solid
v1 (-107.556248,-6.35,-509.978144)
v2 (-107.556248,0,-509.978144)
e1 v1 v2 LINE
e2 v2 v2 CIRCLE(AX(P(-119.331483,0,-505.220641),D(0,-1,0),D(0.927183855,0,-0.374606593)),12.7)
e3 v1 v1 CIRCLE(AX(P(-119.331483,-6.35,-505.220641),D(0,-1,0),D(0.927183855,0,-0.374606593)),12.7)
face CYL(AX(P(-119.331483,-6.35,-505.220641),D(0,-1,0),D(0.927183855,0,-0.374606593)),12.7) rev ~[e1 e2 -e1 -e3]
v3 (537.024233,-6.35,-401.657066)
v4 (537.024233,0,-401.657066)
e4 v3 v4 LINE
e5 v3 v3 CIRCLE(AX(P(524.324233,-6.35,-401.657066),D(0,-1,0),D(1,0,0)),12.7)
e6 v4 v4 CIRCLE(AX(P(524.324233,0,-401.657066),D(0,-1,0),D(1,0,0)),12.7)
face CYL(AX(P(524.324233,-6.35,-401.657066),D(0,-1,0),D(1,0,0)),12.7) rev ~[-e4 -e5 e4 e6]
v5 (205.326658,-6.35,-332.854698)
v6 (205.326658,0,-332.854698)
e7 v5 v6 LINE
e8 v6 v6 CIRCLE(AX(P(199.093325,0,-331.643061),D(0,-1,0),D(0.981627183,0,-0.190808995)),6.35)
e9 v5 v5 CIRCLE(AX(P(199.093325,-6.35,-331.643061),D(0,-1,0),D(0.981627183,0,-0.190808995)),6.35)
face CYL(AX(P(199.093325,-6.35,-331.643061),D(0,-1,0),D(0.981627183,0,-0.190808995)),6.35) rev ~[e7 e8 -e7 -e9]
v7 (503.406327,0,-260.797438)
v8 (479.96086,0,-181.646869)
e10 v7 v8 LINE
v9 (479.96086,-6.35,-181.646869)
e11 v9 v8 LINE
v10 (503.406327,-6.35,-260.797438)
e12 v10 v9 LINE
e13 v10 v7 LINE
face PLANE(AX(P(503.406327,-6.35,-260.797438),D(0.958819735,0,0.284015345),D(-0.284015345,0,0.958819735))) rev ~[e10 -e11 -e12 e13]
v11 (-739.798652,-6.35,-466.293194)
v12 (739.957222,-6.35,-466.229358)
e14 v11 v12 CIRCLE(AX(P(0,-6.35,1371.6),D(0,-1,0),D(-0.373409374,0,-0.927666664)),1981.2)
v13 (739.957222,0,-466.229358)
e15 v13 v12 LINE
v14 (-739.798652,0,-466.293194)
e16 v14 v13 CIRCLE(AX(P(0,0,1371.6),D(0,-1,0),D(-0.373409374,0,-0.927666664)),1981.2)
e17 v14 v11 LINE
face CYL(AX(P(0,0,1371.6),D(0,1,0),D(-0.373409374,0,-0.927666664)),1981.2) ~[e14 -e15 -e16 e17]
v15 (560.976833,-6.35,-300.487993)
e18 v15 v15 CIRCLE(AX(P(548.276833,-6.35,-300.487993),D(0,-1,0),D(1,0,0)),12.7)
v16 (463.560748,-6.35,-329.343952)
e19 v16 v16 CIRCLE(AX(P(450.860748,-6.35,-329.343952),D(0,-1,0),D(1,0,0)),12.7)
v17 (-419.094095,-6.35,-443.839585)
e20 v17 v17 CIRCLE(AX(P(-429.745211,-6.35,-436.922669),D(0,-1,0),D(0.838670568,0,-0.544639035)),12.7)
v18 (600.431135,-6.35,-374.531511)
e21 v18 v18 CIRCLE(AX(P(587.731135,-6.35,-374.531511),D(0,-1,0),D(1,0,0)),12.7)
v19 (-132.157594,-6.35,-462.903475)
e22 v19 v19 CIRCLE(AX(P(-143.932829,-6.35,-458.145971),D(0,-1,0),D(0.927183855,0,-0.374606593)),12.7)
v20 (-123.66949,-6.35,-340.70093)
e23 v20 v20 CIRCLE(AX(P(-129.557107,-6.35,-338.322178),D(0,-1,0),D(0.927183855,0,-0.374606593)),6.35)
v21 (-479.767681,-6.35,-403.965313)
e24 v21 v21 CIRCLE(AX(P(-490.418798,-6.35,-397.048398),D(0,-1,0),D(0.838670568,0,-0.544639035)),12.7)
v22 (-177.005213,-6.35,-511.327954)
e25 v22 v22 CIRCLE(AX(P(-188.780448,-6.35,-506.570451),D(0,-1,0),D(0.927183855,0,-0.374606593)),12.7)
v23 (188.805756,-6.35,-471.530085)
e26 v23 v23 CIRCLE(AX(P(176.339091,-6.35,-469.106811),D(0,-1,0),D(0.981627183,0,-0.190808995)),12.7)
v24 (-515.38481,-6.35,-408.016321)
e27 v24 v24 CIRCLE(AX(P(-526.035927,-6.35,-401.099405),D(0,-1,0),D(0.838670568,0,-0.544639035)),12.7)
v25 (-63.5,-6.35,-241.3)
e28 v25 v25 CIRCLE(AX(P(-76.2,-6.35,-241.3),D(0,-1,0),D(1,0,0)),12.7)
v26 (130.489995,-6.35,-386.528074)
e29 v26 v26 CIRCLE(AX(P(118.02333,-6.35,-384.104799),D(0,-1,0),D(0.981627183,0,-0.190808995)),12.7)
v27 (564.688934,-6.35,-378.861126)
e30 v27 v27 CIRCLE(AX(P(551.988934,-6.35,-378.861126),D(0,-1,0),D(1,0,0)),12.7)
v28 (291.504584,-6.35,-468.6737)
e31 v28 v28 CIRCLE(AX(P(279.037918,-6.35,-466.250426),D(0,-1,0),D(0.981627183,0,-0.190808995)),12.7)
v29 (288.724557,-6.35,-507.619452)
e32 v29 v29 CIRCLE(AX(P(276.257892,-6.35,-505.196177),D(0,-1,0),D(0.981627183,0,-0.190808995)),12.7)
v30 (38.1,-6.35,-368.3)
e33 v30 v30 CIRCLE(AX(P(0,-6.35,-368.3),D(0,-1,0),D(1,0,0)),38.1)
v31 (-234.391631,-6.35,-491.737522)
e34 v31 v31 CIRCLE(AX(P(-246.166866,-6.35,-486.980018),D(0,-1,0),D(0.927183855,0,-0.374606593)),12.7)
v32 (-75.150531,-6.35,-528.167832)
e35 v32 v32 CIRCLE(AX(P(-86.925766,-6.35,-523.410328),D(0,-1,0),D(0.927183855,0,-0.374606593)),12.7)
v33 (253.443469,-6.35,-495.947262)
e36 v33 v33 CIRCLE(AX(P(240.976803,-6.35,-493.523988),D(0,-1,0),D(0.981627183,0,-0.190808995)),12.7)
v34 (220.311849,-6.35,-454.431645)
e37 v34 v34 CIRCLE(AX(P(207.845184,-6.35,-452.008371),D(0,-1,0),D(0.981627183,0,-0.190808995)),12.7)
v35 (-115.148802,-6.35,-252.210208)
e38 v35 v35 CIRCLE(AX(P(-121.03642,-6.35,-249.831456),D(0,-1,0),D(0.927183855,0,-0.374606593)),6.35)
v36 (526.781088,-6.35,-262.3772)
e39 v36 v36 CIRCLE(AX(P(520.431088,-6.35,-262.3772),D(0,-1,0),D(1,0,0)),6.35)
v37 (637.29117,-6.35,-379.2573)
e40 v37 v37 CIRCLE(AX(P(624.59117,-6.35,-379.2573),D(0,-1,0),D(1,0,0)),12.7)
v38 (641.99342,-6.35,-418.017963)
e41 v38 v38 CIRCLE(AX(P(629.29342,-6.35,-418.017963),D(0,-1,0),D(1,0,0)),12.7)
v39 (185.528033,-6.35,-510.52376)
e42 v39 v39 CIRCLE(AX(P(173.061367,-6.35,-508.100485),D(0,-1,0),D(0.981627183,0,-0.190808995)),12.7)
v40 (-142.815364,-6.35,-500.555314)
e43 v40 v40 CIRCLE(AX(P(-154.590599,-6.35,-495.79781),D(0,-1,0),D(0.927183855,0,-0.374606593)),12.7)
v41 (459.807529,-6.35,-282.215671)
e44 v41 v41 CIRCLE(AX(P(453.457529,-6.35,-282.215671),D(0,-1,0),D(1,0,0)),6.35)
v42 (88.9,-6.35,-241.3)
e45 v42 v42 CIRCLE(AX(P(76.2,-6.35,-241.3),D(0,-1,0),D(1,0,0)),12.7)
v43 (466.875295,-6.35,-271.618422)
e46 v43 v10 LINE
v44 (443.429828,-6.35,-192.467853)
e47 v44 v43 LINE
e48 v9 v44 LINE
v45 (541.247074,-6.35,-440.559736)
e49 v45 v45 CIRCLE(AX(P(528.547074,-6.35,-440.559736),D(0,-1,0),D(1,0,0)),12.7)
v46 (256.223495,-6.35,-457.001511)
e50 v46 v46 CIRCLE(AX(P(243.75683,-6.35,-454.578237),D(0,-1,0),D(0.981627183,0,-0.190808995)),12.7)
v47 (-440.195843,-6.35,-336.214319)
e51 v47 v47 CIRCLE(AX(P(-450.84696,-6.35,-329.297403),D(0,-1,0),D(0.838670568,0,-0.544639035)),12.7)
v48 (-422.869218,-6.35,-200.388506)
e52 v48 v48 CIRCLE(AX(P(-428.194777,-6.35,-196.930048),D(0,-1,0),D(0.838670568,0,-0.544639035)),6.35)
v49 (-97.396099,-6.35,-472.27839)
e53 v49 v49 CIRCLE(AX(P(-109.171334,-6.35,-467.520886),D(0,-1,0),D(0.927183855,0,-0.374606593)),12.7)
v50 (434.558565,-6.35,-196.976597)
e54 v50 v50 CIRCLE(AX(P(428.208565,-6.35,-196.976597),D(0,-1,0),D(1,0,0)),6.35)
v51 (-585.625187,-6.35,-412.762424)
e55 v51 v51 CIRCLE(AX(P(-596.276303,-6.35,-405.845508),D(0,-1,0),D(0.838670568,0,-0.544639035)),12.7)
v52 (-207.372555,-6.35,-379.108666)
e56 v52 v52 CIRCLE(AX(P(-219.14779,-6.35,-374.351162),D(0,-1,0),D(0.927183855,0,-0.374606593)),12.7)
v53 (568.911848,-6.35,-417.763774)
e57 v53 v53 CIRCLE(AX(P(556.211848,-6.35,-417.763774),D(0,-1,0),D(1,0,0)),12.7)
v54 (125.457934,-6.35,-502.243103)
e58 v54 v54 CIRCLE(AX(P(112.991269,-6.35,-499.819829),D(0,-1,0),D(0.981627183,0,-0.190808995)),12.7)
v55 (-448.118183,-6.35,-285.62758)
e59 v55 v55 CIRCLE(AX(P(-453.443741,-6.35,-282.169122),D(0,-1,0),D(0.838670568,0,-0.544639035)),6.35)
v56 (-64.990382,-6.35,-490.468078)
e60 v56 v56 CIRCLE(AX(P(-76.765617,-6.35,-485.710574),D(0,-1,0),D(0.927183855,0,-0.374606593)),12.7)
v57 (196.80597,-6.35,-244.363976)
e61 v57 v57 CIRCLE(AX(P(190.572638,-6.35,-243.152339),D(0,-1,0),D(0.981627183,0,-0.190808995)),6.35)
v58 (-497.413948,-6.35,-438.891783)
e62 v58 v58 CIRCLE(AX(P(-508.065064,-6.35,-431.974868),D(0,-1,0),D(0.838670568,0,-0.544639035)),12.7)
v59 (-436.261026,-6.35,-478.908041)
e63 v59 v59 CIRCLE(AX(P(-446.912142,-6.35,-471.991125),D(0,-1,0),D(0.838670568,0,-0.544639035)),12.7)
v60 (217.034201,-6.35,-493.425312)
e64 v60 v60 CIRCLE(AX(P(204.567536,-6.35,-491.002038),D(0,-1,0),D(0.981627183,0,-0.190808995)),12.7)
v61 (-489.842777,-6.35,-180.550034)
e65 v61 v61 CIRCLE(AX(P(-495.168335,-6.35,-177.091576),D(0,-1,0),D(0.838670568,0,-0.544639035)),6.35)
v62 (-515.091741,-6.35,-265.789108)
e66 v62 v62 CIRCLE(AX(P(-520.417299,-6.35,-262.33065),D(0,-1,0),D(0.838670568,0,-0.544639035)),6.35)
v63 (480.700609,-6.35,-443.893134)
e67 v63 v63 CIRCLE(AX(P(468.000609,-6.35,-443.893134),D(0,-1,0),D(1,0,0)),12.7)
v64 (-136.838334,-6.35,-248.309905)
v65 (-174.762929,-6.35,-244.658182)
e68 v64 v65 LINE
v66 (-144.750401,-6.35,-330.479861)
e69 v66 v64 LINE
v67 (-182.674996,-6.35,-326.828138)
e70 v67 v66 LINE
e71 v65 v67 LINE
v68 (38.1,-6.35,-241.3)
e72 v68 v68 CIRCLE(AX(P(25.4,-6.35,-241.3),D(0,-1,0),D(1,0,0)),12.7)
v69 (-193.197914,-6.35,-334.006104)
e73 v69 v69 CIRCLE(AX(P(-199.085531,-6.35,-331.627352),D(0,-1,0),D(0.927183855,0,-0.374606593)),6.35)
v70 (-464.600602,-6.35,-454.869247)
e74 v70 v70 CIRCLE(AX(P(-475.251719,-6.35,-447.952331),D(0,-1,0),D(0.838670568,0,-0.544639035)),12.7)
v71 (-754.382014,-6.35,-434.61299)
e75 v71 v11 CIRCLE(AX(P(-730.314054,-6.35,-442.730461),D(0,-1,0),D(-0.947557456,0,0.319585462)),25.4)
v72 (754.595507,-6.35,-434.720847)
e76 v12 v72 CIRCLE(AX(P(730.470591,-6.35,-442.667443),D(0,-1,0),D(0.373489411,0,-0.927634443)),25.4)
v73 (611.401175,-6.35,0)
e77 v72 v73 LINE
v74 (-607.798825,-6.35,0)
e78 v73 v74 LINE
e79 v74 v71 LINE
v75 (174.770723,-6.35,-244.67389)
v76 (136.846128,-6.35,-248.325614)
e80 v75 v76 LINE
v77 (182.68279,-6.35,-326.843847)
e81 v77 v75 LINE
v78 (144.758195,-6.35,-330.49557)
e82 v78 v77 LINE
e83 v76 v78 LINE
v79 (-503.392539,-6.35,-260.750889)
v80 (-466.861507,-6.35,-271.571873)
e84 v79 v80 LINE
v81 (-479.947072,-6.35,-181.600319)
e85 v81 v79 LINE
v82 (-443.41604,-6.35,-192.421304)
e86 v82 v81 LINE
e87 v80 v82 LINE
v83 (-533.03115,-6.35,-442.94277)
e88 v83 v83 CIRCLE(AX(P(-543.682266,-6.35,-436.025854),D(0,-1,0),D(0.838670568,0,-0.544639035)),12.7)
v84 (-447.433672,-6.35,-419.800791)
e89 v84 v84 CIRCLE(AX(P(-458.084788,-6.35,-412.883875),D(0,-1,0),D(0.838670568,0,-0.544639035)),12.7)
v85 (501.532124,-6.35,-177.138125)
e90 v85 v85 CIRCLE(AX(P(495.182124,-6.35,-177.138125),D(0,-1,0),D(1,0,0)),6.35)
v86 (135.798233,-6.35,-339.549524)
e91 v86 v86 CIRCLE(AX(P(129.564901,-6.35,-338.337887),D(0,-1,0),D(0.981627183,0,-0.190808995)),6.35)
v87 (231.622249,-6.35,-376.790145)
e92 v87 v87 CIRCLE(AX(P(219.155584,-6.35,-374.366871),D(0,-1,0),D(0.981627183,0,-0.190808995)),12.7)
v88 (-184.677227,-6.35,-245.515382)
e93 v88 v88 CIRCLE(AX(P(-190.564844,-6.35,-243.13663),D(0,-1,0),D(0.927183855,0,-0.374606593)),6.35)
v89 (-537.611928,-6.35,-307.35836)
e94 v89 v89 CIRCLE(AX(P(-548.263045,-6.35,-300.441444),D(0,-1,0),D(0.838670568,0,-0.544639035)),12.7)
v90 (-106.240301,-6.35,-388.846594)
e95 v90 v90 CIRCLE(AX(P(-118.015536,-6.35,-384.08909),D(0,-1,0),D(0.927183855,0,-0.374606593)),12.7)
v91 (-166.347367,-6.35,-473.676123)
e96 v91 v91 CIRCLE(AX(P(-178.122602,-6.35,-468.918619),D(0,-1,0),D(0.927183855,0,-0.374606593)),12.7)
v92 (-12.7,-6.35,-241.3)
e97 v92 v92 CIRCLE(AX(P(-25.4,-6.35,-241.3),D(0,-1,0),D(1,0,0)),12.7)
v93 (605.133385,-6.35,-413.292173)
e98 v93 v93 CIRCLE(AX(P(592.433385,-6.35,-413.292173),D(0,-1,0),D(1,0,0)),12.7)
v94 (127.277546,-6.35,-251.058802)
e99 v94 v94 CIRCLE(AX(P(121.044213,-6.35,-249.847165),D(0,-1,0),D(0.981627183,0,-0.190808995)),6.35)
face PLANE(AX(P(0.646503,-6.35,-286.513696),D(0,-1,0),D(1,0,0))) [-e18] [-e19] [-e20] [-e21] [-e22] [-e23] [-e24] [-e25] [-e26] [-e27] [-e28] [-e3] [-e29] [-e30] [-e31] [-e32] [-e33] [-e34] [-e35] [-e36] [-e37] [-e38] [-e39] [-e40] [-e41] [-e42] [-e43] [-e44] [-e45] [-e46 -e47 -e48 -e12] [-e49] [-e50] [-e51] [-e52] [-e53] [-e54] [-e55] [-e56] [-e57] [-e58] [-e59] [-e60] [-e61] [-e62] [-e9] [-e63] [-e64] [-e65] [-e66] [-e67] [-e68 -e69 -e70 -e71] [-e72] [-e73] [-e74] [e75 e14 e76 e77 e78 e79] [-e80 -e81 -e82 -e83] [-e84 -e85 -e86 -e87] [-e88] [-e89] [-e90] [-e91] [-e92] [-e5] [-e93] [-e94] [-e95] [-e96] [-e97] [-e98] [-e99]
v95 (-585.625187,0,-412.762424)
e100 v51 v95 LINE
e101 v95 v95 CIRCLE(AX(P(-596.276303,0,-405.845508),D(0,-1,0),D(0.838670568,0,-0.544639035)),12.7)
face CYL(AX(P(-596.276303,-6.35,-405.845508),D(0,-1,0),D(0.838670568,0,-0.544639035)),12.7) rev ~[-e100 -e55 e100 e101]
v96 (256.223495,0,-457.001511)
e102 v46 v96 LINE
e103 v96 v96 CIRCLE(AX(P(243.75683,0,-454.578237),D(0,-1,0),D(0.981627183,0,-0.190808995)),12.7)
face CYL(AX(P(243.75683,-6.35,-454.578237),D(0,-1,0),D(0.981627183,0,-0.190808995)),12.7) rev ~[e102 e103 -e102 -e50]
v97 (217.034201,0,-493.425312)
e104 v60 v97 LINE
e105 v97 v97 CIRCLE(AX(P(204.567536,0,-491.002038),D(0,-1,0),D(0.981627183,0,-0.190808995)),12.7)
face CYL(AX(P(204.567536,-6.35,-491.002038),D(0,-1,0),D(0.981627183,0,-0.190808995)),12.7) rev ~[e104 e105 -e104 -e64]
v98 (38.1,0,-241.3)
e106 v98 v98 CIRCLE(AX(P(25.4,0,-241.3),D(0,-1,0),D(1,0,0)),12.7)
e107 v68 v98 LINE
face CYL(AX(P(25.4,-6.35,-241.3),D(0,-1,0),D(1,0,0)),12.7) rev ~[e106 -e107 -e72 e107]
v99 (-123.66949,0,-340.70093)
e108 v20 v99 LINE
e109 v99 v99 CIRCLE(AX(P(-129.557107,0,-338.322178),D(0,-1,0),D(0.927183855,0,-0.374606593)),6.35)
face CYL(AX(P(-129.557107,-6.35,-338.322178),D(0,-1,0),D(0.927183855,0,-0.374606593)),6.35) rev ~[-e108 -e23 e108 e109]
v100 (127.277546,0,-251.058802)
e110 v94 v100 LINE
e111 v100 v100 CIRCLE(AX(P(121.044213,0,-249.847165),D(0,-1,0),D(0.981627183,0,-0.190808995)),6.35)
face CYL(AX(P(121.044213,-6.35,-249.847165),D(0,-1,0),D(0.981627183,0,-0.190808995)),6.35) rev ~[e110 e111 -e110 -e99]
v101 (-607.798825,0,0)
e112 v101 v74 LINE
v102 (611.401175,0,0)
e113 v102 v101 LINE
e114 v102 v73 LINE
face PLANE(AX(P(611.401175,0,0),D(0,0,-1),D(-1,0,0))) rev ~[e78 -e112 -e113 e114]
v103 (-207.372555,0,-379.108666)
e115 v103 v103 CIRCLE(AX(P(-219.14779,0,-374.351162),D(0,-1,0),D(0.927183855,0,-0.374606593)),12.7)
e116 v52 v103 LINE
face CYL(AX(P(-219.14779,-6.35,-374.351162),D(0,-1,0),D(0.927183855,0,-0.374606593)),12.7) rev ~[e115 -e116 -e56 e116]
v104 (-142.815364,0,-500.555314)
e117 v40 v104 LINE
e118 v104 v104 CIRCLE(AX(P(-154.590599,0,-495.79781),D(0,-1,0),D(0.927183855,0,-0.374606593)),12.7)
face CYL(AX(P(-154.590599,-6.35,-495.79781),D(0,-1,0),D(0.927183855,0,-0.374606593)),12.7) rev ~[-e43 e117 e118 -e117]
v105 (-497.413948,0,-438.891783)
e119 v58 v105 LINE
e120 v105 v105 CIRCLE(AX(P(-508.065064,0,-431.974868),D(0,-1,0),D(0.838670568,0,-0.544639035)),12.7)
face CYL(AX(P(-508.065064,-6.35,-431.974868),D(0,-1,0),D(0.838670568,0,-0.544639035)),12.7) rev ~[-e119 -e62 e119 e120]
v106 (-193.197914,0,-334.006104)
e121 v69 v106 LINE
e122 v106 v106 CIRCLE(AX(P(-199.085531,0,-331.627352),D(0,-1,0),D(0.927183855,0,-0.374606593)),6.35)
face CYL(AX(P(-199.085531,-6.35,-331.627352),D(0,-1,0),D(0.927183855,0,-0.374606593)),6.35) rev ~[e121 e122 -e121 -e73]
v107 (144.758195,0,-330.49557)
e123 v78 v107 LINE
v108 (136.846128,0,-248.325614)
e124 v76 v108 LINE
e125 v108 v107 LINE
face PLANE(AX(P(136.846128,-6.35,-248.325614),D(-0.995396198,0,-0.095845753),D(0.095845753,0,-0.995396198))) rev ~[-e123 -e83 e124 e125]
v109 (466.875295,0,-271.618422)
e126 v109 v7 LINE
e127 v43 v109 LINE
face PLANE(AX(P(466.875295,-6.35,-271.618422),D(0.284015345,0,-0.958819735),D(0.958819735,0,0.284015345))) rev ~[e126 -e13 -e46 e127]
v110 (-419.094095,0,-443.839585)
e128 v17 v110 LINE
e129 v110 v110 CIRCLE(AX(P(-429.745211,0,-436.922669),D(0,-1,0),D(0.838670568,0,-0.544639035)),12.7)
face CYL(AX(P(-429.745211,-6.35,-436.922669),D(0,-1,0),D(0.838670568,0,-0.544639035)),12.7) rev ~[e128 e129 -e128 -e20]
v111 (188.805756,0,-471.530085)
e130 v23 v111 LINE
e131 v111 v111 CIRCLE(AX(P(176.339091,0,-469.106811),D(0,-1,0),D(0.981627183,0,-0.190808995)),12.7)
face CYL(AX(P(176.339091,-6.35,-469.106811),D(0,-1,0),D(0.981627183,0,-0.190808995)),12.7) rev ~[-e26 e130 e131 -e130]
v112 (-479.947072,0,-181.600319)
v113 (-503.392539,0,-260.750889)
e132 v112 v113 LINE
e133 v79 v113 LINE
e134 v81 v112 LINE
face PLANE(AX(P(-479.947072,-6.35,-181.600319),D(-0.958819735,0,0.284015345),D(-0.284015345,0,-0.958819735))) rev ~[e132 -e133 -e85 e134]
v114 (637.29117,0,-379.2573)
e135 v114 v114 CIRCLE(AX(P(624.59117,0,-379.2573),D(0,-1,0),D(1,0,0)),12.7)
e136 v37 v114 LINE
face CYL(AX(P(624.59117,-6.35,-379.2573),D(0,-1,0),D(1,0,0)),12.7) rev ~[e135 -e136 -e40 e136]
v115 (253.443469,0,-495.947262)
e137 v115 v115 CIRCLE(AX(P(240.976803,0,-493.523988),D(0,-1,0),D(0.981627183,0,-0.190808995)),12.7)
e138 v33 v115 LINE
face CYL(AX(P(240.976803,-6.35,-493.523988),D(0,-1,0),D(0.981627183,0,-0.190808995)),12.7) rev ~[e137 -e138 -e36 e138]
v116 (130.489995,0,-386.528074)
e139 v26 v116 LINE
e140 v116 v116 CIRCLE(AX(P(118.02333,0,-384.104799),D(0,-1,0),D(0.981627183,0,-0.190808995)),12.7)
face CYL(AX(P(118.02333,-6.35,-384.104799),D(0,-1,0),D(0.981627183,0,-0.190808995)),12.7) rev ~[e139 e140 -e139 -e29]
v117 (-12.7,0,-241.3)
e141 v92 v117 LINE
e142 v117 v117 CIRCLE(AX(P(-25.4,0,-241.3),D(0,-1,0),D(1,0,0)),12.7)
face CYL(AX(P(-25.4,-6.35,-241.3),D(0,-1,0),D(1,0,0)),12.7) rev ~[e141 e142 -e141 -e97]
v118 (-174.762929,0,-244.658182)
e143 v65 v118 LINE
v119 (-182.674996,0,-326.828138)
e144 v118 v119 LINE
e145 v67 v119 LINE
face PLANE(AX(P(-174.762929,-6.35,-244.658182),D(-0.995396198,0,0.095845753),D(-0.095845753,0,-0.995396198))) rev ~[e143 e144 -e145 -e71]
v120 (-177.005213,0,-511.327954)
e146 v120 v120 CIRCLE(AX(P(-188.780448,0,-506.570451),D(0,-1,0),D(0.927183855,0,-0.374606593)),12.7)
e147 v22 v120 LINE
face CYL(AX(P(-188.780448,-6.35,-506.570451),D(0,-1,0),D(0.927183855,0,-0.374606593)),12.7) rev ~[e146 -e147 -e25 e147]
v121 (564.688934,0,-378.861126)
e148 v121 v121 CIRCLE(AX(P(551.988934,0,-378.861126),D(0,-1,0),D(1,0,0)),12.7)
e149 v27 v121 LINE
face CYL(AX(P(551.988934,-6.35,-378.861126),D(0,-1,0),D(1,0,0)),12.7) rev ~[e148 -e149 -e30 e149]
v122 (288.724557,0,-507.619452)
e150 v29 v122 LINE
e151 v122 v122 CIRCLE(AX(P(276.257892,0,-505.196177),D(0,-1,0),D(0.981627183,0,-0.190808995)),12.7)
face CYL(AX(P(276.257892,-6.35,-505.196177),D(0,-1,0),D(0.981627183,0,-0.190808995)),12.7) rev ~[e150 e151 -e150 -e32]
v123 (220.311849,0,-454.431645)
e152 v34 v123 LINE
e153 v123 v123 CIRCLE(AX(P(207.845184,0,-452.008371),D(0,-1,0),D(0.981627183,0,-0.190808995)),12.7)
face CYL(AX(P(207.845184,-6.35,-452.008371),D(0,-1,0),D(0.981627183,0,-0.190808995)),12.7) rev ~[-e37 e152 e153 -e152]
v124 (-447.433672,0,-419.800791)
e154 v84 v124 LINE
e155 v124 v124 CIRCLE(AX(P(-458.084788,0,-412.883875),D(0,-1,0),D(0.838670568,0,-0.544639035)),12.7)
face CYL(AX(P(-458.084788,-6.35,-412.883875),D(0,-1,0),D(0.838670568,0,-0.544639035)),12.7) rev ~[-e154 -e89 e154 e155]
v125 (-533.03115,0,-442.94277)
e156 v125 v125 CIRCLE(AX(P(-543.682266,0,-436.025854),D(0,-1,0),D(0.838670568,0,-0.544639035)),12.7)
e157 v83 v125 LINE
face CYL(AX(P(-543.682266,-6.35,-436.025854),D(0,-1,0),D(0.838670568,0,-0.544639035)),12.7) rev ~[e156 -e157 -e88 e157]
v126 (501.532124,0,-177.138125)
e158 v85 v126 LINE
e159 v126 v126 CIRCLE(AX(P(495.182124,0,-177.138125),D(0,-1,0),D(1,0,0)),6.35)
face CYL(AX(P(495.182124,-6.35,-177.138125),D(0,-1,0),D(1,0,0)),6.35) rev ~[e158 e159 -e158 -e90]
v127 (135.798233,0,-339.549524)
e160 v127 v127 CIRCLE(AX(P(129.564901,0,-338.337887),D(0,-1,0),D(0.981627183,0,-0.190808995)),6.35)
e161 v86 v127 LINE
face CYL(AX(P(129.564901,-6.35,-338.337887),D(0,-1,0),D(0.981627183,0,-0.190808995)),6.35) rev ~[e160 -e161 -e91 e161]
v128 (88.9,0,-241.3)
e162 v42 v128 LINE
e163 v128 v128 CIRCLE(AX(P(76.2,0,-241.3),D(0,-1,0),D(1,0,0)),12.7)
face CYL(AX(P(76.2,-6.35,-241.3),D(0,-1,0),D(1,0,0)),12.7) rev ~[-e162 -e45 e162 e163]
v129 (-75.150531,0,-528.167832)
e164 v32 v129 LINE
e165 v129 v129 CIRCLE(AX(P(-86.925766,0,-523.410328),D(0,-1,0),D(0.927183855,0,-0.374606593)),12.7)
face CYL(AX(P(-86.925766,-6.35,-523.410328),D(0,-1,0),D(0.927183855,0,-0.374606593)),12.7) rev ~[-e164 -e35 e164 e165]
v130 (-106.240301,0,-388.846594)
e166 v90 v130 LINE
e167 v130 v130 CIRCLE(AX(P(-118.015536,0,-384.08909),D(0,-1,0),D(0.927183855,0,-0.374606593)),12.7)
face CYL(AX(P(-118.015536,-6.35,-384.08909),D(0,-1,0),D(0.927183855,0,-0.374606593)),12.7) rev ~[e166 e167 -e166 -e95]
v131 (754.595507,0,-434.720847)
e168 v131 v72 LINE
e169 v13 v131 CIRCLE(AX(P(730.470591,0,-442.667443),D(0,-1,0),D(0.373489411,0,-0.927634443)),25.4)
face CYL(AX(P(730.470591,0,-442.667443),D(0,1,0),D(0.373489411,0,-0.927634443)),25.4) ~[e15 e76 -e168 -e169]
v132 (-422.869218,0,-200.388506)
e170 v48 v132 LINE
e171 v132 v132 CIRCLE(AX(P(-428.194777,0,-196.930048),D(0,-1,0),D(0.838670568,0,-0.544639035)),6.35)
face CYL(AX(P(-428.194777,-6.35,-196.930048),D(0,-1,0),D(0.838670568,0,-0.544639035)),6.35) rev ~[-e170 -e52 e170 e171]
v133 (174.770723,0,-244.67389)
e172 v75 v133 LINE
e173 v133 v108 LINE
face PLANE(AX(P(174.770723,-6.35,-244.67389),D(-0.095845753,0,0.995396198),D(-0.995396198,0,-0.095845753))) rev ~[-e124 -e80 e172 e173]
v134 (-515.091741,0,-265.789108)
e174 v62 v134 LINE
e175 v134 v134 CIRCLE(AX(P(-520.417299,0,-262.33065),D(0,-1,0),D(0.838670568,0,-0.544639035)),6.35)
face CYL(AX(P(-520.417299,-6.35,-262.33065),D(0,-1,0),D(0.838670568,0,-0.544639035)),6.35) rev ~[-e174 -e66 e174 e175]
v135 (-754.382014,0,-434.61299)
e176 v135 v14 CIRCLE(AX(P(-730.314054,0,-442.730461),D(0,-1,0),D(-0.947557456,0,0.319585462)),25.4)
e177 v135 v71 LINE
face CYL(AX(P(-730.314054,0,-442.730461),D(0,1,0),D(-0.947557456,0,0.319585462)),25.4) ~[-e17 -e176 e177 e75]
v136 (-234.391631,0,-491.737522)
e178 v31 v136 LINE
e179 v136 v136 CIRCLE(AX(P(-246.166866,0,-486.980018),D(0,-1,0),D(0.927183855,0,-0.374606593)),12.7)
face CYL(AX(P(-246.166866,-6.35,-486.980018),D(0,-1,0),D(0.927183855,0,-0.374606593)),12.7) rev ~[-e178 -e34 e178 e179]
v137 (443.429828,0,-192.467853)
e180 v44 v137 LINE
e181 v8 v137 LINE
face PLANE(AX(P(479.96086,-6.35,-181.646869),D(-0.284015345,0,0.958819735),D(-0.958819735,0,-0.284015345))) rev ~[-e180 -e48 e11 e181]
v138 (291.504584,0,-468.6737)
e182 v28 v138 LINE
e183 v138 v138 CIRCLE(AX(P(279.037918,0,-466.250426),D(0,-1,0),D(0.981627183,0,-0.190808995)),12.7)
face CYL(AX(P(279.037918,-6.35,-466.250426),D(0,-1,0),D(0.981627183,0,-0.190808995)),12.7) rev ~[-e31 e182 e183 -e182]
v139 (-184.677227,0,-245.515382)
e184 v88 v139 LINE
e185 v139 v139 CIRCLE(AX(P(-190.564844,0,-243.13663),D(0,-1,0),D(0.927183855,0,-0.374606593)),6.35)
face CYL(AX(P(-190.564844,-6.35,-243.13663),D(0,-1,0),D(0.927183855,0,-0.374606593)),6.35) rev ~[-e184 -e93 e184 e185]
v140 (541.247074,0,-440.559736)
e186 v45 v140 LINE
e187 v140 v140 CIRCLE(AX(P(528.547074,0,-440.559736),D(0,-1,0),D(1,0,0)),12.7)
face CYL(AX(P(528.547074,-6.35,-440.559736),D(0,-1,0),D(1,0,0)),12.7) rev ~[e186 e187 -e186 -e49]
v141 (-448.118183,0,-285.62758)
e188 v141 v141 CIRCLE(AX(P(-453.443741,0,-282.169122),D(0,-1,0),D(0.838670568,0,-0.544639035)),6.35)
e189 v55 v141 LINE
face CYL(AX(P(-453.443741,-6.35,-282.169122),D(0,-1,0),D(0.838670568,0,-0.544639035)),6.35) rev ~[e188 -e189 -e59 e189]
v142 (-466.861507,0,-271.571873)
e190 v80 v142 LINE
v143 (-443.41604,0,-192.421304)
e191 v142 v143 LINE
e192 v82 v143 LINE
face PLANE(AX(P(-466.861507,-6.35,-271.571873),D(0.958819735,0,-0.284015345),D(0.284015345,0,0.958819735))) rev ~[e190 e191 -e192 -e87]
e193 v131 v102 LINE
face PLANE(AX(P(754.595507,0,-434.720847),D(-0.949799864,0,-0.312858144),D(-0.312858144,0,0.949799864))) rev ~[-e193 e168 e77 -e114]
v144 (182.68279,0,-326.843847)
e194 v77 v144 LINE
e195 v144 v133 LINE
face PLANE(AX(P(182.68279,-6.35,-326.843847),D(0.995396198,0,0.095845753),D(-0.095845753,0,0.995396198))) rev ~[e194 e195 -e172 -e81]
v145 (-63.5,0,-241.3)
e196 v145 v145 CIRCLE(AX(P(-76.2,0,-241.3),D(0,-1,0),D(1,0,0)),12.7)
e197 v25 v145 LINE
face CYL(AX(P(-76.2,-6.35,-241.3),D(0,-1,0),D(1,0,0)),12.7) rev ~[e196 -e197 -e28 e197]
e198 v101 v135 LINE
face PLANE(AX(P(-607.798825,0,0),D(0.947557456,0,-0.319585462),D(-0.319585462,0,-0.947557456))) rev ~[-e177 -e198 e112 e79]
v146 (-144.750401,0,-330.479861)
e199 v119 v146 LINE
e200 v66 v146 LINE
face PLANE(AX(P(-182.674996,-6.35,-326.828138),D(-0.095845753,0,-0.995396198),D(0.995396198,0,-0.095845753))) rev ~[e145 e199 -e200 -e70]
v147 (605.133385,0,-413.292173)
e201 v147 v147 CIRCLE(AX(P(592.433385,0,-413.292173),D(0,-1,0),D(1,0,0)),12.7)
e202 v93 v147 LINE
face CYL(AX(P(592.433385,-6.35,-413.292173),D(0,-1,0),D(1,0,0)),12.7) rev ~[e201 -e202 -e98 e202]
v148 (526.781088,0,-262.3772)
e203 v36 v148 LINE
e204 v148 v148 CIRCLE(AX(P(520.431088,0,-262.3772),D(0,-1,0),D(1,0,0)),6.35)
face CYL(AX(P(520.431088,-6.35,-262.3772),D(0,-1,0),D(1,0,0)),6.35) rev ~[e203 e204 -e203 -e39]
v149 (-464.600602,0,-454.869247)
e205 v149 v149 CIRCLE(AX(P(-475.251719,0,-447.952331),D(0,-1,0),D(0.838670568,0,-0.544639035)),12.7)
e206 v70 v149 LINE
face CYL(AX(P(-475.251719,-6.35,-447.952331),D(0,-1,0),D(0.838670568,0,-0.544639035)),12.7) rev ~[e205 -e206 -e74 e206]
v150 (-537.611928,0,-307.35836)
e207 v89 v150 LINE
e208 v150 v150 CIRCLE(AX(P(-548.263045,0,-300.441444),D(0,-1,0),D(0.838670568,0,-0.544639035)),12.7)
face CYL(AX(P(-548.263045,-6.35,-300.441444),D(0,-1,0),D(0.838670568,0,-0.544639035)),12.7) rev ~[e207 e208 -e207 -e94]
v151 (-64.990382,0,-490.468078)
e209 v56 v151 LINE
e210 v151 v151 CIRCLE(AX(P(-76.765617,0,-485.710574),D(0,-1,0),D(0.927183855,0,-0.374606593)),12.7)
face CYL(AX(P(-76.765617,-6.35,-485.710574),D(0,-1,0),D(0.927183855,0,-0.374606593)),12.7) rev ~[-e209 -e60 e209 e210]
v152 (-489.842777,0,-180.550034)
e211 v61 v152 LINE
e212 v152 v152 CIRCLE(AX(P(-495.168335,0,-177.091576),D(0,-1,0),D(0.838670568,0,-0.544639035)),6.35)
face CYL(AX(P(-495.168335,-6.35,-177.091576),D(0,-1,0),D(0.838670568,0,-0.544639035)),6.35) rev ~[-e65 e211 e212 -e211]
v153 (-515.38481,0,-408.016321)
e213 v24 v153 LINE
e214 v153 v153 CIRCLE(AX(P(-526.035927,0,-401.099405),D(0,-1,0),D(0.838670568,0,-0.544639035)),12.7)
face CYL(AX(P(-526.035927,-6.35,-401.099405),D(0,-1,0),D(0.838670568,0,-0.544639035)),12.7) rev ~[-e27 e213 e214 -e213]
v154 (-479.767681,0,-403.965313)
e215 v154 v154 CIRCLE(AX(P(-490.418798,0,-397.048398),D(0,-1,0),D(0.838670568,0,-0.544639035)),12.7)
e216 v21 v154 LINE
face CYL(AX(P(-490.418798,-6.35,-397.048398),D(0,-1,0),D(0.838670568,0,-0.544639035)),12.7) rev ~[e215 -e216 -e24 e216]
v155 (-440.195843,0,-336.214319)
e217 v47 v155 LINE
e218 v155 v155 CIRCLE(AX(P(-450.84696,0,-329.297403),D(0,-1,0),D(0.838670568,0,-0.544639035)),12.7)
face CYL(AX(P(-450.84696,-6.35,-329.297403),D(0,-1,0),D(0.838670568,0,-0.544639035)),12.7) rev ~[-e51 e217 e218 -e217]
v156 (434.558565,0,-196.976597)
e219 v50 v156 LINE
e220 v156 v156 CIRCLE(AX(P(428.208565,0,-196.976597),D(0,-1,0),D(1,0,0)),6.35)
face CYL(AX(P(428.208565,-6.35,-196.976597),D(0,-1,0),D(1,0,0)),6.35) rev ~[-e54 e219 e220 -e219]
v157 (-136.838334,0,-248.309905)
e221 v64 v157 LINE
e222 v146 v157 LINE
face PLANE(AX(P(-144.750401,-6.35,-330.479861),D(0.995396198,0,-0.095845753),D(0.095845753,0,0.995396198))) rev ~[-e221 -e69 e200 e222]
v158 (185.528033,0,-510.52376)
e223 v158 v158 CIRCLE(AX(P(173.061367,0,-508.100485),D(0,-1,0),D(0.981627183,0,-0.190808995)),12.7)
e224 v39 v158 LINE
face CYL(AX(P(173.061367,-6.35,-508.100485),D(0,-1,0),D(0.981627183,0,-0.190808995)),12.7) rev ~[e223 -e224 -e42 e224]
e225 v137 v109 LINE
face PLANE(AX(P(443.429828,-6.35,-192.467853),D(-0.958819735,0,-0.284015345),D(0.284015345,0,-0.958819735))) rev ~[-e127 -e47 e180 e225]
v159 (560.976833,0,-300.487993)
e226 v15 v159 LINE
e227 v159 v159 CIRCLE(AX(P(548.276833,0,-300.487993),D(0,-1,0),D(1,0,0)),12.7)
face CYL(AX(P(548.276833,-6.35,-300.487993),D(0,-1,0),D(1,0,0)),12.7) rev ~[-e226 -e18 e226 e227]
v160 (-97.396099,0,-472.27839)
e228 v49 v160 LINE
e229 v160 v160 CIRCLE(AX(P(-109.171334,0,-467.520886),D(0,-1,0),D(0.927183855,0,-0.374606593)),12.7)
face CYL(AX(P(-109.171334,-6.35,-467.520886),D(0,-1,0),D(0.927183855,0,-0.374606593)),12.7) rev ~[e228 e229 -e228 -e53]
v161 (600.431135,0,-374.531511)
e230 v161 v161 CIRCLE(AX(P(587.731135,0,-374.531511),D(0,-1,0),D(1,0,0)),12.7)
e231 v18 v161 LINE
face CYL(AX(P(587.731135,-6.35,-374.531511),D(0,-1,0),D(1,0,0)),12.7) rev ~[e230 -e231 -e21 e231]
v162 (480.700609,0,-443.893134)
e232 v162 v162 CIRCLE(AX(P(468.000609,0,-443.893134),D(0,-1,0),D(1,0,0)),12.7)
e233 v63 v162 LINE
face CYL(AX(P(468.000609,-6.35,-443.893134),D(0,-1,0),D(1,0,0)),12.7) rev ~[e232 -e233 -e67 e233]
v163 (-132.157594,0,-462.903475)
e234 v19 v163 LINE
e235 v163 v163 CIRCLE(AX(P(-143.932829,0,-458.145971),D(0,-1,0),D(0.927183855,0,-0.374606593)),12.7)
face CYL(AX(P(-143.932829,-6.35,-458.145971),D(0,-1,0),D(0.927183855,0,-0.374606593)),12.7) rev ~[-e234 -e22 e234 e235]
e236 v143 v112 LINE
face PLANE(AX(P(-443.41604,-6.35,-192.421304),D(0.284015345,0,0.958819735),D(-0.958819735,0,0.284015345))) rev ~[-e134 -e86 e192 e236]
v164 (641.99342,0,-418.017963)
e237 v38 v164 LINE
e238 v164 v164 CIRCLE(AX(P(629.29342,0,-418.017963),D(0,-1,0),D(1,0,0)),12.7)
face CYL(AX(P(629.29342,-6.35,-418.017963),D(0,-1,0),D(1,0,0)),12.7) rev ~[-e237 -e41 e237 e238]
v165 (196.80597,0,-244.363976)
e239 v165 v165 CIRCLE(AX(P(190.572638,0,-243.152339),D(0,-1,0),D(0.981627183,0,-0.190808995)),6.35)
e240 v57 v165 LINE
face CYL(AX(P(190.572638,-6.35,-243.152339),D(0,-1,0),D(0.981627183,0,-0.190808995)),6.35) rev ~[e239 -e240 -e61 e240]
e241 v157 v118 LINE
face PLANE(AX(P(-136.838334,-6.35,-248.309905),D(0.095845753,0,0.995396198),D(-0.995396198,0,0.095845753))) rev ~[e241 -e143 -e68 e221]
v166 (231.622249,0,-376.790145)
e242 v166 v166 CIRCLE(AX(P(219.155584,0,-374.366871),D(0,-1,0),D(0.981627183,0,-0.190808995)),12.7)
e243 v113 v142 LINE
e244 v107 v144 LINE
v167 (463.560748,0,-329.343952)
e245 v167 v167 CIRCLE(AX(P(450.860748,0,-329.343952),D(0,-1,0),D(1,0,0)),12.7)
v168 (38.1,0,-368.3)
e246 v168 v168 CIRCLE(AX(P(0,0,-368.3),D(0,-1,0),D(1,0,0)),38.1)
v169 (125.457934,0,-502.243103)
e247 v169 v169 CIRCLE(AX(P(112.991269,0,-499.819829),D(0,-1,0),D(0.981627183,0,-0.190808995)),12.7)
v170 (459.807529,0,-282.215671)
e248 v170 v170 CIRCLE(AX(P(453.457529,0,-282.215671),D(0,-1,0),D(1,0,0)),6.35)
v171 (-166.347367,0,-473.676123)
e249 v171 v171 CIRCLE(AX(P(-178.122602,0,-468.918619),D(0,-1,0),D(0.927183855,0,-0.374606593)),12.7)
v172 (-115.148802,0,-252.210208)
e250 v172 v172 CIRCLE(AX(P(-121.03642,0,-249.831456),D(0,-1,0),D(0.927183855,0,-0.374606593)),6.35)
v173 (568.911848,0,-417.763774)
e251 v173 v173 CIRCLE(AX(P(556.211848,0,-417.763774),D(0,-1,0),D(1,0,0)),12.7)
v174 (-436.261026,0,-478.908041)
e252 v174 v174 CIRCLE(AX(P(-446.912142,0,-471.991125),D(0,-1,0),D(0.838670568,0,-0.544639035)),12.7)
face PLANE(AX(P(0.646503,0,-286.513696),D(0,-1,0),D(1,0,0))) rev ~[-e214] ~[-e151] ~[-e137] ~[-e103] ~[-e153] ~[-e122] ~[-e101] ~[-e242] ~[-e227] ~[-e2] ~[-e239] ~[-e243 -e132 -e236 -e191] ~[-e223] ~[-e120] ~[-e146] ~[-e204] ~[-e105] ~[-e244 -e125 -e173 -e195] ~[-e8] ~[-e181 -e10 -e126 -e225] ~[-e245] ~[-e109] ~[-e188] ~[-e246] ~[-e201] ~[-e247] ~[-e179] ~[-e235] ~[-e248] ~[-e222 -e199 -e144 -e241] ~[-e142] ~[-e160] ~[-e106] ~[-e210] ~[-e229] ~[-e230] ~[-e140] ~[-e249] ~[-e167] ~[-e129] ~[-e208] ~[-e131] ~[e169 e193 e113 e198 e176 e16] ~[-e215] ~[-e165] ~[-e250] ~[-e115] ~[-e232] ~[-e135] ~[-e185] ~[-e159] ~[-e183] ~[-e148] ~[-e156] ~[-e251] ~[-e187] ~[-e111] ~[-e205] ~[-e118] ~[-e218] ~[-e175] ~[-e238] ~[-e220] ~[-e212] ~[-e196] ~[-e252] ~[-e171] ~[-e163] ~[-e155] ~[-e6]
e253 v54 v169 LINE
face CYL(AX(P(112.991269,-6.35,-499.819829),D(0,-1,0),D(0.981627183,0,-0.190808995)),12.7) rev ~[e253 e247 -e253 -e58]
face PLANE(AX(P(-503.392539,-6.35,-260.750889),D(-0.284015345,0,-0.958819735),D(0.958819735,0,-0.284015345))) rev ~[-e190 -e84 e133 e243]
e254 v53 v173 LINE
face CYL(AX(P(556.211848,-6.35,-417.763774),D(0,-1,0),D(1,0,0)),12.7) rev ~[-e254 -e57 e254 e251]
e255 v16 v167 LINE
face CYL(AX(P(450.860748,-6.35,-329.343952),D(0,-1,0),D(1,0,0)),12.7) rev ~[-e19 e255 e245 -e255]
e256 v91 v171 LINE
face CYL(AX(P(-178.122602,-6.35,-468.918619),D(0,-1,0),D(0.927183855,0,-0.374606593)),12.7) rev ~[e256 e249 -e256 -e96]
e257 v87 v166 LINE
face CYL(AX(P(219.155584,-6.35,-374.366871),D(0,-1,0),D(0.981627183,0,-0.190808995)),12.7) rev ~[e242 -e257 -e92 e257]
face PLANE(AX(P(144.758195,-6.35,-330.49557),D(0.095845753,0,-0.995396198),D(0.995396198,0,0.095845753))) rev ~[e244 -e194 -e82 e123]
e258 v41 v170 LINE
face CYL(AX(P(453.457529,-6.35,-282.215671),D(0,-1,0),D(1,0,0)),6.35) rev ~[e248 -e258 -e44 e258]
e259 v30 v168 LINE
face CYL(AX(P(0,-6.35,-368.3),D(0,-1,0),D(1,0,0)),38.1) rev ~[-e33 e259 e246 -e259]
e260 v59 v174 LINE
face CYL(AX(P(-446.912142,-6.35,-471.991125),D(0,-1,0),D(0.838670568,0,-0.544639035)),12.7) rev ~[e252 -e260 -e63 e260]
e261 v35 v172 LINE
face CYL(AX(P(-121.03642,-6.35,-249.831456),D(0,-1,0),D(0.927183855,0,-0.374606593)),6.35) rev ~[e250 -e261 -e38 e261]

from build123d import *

# Parameters (mm, degrees)
F1_DEPTH        = 6.35
F2_R            = 12.7
F2_R_2          = 6.35
F3_DEPTH        = 6.351
F3_COPIES_COUNT = 4
F3_COPIES_ANGLE = 33
F6_R            = 38.1
F6_R_2          = 12.7
F7_DEPTH        = 6.351


# Not quite as in the source:
# - a pattern or mirror of a feature is missing from the dataset's text; its kind, count and spacing are read off the source's solid


with BuildPart() as f1:
    # F0 (on Front) → F1 (new body)
    with BuildSketch(Plane.XZ):
        with BuildLine():
            Line((611.4011750653, 0), (-607.7988249347, 0))
            Line((-607.7988249347, 0), (-754.3820135261, -434.6129904367))
            ThreePointArc((-754.3820135261, -434.6129904367), (-753.3868164341, -453.3515552834), (-739.7986522476, -466.2931944302))
            ThreePointArc((-739.7986522476, -466.2931944302), (0.0854683246, -609.5999981565), (739.9572217249, -466.2293582423))
            ThreePointArc((739.9572217249, -466.2293582423), (753.5060114552, -453.3692838691), (754.5955072236, -434.7208465349))
            Line((754.5955072236, -434.7208465349), (611.4011750653, 0))
        make_face()
    extrude(amount=F1_DEPTH)

    # F2 (on face) → F3 (cut, through all)
    with BuildSketch(Plane.XZ.offset(6.35)):
        with Locations((624.5911696341, -379.2573002913)):
            Circle(F2_R)
        with Locations((629.293420012, -418.017962579)):
            Circle(F2_R)
        with Locations((587.7311349843, -374.5315110857)):
            Circle(F2_R)
        with Locations((592.4333853621, -413.2921733735)):
            Circle(F2_R)
        with Locations((551.9889335366, -378.8611260422)):
            Circle(F2_R)
        with Locations((556.2118480679, -417.7637740763)):
            Circle(F2_R)
        with Locations((524.3242327175, -401.6570658257)):
            Circle(F2_R)
        with Locations((528.5470741868, -440.5597355017)):
            Circle(F2_R)
        with Locations((468.0006088828, -443.8931335302)):
            Circle(F2_R)
        with Locations((450.8607480357, -329.3439521574)):
            Circle(F2_R)
        with Locations((548.2768330983, -300.4879931354)):
            Circle(F2_R)
        Polygon((479.9608602999, -181.6468686851), (443.4298284015, -192.4678533183), (466.8752951068, -271.6184224317), (503.4063270052, -260.7974377985), align=None)
        with Locations((453.4575292546, -282.2156713453)):
            Circle(F2_R_2)
        with Locations((520.4310877351, -262.3771995177)):
            Circle(F2_R_2)
        with Locations((428.2085651104, -196.9765969155)):
            Circle(F2_R_2)
        with Locations((495.182123591, -177.138125088)):
            Circle(F2_R_2)
    f3 = extrude(amount=-F3_DEPTH, mode=Mode.SUBTRACT)

    # F3_copies: F3 ×4 about axis
    f3_copies_axis = Axis((0.085468, 0, 1371.6), (0, 1, 0))
    for i in range(1, F3_COPIES_COUNT):
        add(f3.rotate(f3_copies_axis, i * F3_COPIES_ANGLE / (F3_COPIES_COUNT - 1)), mode=Mode.SUBTRACT)

    # F6 (on face) → F7 (cut, through all)
    with BuildSketch(Plane.XZ.offset(6.35)):
        with Locations((0, -368.3)):
            Circle(F6_R)
        with Locations((-76.2, -241.3)):
            Circle(F6_R_2)
        with Locations((-25.4, -241.3)):
            Circle(F6_R_2)
        with Locations((25.4, -241.3)):
            Circle(F6_R_2)
        with Locations((76.2, -241.3)):
            Circle(F6_R_2)
    extrude(amount=-F7_DEPTH, mode=Mode.SUBTRACT)


solid = f1.part
